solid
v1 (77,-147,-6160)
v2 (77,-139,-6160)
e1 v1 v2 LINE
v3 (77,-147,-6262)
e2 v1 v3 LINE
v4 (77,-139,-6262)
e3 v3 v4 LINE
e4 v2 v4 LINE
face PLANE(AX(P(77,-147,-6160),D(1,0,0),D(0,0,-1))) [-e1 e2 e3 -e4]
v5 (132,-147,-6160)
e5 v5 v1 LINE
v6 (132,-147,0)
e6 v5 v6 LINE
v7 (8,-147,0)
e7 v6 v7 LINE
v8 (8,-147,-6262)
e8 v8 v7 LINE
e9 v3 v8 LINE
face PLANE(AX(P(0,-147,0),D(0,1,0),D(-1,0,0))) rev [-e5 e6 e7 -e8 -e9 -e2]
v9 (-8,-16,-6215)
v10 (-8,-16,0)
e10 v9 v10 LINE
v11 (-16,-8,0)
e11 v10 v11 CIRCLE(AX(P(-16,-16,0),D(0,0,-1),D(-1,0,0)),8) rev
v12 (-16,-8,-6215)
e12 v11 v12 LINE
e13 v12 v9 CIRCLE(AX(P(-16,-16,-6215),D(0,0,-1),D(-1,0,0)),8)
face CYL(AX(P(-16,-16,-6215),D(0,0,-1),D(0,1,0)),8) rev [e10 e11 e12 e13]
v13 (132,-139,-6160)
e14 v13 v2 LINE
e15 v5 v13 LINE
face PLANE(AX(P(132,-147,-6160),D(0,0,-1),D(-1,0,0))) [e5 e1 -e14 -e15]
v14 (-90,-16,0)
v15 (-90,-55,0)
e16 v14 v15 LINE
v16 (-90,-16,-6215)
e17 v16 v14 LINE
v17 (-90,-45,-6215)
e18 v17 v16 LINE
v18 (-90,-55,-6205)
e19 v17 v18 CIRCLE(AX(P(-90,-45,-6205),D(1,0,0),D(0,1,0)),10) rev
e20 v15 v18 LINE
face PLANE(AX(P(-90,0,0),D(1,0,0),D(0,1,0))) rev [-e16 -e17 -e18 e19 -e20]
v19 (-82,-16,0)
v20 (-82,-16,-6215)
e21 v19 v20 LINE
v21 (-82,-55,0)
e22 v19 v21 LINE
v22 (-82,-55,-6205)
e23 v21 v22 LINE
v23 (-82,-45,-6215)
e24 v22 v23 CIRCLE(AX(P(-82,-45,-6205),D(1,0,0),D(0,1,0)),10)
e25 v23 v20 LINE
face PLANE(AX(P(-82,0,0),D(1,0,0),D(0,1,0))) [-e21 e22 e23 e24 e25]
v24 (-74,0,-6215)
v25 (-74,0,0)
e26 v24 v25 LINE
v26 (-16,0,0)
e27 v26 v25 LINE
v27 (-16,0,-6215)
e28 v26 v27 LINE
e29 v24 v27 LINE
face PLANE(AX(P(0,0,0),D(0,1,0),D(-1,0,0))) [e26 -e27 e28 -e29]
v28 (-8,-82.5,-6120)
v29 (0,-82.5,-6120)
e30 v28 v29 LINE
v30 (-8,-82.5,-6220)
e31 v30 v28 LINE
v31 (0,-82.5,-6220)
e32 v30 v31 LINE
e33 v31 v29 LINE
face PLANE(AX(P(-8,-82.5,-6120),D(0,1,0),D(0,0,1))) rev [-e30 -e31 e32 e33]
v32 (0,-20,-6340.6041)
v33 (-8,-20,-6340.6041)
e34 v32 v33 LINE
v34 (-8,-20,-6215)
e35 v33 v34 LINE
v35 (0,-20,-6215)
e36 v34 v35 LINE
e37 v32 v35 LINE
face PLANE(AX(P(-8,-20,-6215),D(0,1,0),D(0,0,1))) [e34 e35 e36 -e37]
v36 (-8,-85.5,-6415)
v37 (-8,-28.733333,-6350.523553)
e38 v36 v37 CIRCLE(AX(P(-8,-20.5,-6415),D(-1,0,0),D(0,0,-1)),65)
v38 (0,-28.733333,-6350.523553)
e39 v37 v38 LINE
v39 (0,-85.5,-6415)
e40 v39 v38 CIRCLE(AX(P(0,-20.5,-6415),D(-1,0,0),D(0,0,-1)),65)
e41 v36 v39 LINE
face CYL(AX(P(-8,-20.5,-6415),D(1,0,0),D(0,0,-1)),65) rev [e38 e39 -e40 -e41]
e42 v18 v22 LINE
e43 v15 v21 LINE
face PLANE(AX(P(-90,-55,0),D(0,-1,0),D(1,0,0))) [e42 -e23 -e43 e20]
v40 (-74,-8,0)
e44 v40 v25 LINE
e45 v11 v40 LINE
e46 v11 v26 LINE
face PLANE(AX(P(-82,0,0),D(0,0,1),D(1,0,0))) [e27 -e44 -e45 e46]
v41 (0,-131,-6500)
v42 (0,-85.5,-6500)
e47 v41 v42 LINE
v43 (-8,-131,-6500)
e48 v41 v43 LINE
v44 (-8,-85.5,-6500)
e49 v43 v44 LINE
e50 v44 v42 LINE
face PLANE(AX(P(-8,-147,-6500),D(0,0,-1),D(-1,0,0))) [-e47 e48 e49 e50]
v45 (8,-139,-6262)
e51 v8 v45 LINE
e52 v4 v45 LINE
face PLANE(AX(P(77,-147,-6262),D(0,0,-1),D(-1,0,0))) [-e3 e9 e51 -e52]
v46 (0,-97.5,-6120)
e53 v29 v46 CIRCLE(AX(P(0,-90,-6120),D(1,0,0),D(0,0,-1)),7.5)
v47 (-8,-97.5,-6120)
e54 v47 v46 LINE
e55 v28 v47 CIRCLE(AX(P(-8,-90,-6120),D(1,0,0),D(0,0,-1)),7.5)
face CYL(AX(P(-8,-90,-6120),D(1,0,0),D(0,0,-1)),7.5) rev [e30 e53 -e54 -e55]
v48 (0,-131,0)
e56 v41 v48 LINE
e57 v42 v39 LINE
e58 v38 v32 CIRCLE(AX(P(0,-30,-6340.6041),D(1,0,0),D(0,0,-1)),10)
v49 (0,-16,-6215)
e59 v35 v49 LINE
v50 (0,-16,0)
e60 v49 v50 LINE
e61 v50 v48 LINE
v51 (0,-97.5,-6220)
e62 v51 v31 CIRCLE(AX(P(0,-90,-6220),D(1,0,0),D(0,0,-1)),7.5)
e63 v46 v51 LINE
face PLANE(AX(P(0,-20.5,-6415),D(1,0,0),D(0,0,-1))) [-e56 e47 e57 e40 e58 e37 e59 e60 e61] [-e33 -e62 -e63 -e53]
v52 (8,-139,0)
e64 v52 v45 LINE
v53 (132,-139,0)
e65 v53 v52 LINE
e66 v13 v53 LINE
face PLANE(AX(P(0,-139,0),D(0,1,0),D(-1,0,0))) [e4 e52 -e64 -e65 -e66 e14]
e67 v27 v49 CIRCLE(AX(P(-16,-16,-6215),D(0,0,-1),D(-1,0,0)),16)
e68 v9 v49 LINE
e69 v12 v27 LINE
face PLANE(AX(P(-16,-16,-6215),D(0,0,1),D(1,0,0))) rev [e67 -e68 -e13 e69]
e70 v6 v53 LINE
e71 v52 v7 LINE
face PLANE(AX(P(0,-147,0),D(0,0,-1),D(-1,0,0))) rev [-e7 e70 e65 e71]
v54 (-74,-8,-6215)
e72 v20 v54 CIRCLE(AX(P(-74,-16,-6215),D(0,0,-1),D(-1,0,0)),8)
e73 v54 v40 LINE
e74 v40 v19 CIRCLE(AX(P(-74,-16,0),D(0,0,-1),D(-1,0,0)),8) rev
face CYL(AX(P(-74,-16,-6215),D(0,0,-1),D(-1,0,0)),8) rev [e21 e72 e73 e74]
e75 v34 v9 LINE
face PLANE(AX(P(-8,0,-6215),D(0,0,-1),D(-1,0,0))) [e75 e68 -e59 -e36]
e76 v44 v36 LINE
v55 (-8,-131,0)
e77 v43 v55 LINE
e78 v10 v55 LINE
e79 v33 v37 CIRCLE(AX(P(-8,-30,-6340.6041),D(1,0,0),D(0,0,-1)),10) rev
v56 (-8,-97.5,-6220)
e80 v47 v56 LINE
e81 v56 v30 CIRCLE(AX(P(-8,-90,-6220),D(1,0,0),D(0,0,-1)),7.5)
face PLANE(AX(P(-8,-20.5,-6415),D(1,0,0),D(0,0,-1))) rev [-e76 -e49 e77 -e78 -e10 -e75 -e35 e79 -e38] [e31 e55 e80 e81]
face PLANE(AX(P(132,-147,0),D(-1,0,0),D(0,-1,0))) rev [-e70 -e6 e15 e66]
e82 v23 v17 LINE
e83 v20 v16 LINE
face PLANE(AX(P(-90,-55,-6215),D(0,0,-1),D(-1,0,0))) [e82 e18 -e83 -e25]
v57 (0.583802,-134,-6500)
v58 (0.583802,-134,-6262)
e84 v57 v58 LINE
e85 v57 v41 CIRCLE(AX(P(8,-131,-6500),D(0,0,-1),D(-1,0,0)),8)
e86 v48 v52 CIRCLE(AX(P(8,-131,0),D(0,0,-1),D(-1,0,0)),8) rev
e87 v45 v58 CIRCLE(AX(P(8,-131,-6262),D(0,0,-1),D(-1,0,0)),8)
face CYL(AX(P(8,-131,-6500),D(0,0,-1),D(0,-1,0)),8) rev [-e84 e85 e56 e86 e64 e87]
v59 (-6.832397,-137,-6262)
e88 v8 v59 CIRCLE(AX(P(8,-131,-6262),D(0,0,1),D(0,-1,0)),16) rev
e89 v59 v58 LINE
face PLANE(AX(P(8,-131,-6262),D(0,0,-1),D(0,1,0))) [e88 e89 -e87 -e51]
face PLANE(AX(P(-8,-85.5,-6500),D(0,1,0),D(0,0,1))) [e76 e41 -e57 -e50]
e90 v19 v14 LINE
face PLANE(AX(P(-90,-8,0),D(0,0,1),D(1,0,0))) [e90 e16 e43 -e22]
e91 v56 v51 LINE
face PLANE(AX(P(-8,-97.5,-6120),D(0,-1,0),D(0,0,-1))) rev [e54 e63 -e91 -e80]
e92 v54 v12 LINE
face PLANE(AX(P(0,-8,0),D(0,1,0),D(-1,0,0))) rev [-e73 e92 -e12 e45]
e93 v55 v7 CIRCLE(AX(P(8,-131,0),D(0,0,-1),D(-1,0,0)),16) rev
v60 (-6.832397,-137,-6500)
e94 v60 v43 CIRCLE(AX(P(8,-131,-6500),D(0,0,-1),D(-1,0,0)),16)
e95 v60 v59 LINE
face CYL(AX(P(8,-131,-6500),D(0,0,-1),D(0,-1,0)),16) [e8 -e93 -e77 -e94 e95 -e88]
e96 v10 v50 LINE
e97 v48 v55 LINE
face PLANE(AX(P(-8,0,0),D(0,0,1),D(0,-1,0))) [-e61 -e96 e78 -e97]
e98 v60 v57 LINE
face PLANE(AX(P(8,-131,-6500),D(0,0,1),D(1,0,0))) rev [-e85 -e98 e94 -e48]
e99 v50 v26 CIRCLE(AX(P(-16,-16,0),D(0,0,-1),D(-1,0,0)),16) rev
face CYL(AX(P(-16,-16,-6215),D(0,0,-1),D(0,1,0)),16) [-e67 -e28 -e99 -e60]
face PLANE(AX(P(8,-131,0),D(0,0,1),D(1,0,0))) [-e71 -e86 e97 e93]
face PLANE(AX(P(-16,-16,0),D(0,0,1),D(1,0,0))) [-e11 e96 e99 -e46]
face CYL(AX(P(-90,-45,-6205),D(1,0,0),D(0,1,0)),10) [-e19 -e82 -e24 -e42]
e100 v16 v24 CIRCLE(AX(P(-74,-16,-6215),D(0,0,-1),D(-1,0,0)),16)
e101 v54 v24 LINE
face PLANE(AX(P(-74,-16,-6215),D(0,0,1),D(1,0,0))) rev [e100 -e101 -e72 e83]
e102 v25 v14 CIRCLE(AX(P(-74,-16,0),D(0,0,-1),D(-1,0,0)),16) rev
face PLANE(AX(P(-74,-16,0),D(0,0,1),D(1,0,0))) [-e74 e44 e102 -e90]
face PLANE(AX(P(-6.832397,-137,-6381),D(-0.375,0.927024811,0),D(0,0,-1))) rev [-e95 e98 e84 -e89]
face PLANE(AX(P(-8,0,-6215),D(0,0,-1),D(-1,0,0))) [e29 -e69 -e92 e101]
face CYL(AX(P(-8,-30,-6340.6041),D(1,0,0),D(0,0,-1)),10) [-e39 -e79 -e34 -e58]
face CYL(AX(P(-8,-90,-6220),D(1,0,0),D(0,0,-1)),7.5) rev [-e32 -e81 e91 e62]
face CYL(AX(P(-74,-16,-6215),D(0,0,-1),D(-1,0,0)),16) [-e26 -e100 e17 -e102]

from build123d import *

# Parameters (mm, degrees)
SM_BASE_FLANGE_1_DEPTH           = 8
SM_EDGE_FLANGE_1_STRIP_W         = 48
SM_EDGE_FLANGE_1_STRIP_H         = 8
SM_EDGE_FLANGE_1_STRIP_CUT_DEPTH = 6215
SM_EDGE_FLANGE_1_DEPTH           = 6215
SM_EDGE_FLANGE_2_STRIP_W         = 48
SM_EDGE_FLANGE_2_STRIP_H         = 8
SM_EDGE_FLANGE_2_STRIP_CUT_DEPTH = 6215
SM_EDGE_FLANGE_2_DEPTH           = 6215
SM_EDGE_FLANGE_3_STRIP_W         = 48
SM_EDGE_FLANGE_3_STRIP_H         = 8
SM_EDGE_FLANGE_3_STRIP_CUT_DEPTH = 6500
SM_EDGE_FLANGE_3_DEPTH           = 6500
FILLET_1_R                       = 10
CUT_EXTRUDE_START                = -6500
CUT_EXTRUDE_3_DEPTH              = 238
CUT_EXTRUDE_START_2              = -6262
CUT_EXTRUDE_3_2_OUTLINE_W        = 55
CUT_EXTRUDE_3_2_OUTLINE_H        = 8
CUT_EXTRUDE_3_2_DEPTH            = 102


# Read off the part's stored shape, not the designer's step: 切除-拉伸3
# Sheet-metal steps are written as plain solids
with BuildPart() as part:
    # Sketch 1 → 基体-法兰1 (new body)
    with BuildSketch(Plane(origin=(0, 0, 0), x_dir=(0, 0, -1), z_dir=(1, 0, 0))):
        with BuildLine():
            Line((0, 0), (6215, 0))
            Line((6215, 0), (6215, -20))
            Line((6215, -20), (6350.001923105, -20))
            ThreePointArc((6350.001923105, -20), (6368.861621181, -66.284822813), (6415, -85.5))
            Line((6415, -85.5), (6500, -85.5))
            Line((6500, -85.5), (6500, -147))
            Line((6500, -147), (0, -147))
            Line((0, -147), (0, 0))
        make_face()
        with BuildLine():
            Line((6120, -82.5), (6220, -82.5))
            ThreePointArc((6220, -82.5), (6227.5, -90), (6220, -97.5))
            Line((6220, -97.5), (6120, -97.5))
            ThreePointArc((6120, -97.5), (6112.5, -90), (6120, -82.5))
        make_face(mode=Mode.SUBTRACT)
    extrude(amount=-SM_BASE_FLANGE_1_DEPTH)

    # 边线-法兰1 strip (across the edge) → 边线-法兰1 strip cut (cut)
    with BuildSketch(Plane(origin=(-8, 0, 0), x_dir=(0, -1, 0), z_dir=(0, 0, -1))):
        with Locations((-8, -4)):
            Rectangle(SM_EDGE_FLANGE_1_STRIP_W, SM_EDGE_FLANGE_1_STRIP_H)
    extrude(amount=SM_EDGE_FLANGE_1_STRIP_CUT_DEPTH, mode=Mode.SUBTRACT)

    # 边线-法兰1 section (across the edge) → 边线-法兰1 (add)
    with BuildSketch(Plane(origin=(-8, 0, 0), x_dir=(0, -1, 0), z_dir=(0, 0, -1))):
        with BuildLine():
            Line((0, 8), (0, 74))
            Line((0, 74), (8, 74))
            Line((8, 74), (8, 8))
            ThreePointArc((8, 8), (10.343145751, 2.343145751), (16, 0))
            Line((16, 0), (16, -8))
            ThreePointArc((16, -8), (4.686291501, -3.313708499), (0, 8))
        make_face()
    extrude(amount=SM_EDGE_FLANGE_1_DEPTH)

    # 边线-法兰2 strip (across the edge) → 边线-法兰2 strip cut (cut)
    with BuildSketch(Plane(origin=(-82, -8, 0), x_dir=(1, 0, 0), z_dir=(0, 0, -1))):
        with Locations((-16, -4)):
            Rectangle(SM_EDGE_FLANGE_2_STRIP_W, SM_EDGE_FLANGE_2_STRIP_H)
    extrude(amount=SM_EDGE_FLANGE_2_STRIP_CUT_DEPTH, mode=Mode.SUBTRACT)

    # 边线-法兰2 section (across the edge) → 边线-法兰2 (add)
    with BuildSketch(Plane(origin=(-82, -8, 0), x_dir=(1, 0, 0), z_dir=(0, 0, -1))):
        with BuildLine():
            Line((-8, 8), (-8, 47))
            Line((-8, 47), (0, 47))
            Line((0, 47), (0, 8))
            ThreePointArc((0, 8), (2.343145751, 2.343145751), (8, 0))
            Line((8, 0), (8, -8))
            ThreePointArc((8, -8), (-3.313708499, -3.313708499), (-8, 8))
        make_face()
    extrude(amount=SM_EDGE_FLANGE_2_DEPTH)

    # 边线-法兰3 strip (across the edge) → 边线-法兰3 strip cut (cut)
    with BuildSketch(Plane(origin=(0, -147, 0), x_dir=(0, 1, 0), z_dir=(0, 0, -1))):
        with Locations((-8, -4)):
            Rectangle(SM_EDGE_FLANGE_3_STRIP_W, SM_EDGE_FLANGE_3_STRIP_H)
    extrude(amount=SM_EDGE_FLANGE_3_STRIP_CUT_DEPTH, mode=Mode.SUBTRACT)

    # 边线-法兰3 section (across the edge) → 边线-法兰3 (add)
    with BuildSketch(Plane(origin=(0, -147, 0), x_dir=(0, 1, 0), z_dir=(0, 0, -1))):
        with BuildLine():
            Line((0, 8), (0, 132))
            Line((0, 132), (8, 132))
            Line((8, 132), (8, 8))
            ThreePointArc((8, 8), (10.343145751, 2.343145751), (16, 0))
            Line((16, 0), (16, -8))
            ThreePointArc((16, -8), (4.686291501, -3.313708499), (0, 8))
        make_face()
    extrude(amount=SM_EDGE_FLANGE_3_DEPTH)

    # 圆角1
    fillet_1_edges = [part.edges().sort_by_distance(p)[0] for p in [
        (-86, -55, -6215),
        (-4, -20, -6350.001923105),
    ]]
    fillet(fillet_1_edges, radius=FILLET_1_R)

    # 切除-拉伸3 outline → 切除-拉伸3 (cut)
    with BuildSketch(Plane.XY.offset(CUT_EXTRUDE_START)):
        with BuildLine():
            Line((8, -147), (132, -147))
            Line((132, -147), (132, -139))
            Line((132, -139), (8, -139))
            ThreePointArc((8, -139), (3.527864045, -137.63324958), (0.583801513, -134))
            Line((0.583801513, -134), (-6.832396974, -137))
            ThreePointArc((-6.832396974, -137), (-0.94427191, -144.266499161), (8, -147))
        make_face()
    extrude(amount=CUT_EXTRUDE_3_DEPTH, mode=Mode.SUBTRACT)

    # Cut-Extrude 3 2 outline → Cut-Extrude 3 2 (cut)
    with BuildSketch(Plane.XY.offset(CUT_EXTRUDE_START_2)):
        with Locations((104.5, -143)):
            Rectangle(CUT_EXTRUDE_3_2_OUTLINE_W, CUT_EXTRUDE_3_2_OUTLINE_H)
    extrude(amount=CUT_EXTRUDE_3_2_DEPTH, mode=Mode.SUBTRACT)


solid = part.part
